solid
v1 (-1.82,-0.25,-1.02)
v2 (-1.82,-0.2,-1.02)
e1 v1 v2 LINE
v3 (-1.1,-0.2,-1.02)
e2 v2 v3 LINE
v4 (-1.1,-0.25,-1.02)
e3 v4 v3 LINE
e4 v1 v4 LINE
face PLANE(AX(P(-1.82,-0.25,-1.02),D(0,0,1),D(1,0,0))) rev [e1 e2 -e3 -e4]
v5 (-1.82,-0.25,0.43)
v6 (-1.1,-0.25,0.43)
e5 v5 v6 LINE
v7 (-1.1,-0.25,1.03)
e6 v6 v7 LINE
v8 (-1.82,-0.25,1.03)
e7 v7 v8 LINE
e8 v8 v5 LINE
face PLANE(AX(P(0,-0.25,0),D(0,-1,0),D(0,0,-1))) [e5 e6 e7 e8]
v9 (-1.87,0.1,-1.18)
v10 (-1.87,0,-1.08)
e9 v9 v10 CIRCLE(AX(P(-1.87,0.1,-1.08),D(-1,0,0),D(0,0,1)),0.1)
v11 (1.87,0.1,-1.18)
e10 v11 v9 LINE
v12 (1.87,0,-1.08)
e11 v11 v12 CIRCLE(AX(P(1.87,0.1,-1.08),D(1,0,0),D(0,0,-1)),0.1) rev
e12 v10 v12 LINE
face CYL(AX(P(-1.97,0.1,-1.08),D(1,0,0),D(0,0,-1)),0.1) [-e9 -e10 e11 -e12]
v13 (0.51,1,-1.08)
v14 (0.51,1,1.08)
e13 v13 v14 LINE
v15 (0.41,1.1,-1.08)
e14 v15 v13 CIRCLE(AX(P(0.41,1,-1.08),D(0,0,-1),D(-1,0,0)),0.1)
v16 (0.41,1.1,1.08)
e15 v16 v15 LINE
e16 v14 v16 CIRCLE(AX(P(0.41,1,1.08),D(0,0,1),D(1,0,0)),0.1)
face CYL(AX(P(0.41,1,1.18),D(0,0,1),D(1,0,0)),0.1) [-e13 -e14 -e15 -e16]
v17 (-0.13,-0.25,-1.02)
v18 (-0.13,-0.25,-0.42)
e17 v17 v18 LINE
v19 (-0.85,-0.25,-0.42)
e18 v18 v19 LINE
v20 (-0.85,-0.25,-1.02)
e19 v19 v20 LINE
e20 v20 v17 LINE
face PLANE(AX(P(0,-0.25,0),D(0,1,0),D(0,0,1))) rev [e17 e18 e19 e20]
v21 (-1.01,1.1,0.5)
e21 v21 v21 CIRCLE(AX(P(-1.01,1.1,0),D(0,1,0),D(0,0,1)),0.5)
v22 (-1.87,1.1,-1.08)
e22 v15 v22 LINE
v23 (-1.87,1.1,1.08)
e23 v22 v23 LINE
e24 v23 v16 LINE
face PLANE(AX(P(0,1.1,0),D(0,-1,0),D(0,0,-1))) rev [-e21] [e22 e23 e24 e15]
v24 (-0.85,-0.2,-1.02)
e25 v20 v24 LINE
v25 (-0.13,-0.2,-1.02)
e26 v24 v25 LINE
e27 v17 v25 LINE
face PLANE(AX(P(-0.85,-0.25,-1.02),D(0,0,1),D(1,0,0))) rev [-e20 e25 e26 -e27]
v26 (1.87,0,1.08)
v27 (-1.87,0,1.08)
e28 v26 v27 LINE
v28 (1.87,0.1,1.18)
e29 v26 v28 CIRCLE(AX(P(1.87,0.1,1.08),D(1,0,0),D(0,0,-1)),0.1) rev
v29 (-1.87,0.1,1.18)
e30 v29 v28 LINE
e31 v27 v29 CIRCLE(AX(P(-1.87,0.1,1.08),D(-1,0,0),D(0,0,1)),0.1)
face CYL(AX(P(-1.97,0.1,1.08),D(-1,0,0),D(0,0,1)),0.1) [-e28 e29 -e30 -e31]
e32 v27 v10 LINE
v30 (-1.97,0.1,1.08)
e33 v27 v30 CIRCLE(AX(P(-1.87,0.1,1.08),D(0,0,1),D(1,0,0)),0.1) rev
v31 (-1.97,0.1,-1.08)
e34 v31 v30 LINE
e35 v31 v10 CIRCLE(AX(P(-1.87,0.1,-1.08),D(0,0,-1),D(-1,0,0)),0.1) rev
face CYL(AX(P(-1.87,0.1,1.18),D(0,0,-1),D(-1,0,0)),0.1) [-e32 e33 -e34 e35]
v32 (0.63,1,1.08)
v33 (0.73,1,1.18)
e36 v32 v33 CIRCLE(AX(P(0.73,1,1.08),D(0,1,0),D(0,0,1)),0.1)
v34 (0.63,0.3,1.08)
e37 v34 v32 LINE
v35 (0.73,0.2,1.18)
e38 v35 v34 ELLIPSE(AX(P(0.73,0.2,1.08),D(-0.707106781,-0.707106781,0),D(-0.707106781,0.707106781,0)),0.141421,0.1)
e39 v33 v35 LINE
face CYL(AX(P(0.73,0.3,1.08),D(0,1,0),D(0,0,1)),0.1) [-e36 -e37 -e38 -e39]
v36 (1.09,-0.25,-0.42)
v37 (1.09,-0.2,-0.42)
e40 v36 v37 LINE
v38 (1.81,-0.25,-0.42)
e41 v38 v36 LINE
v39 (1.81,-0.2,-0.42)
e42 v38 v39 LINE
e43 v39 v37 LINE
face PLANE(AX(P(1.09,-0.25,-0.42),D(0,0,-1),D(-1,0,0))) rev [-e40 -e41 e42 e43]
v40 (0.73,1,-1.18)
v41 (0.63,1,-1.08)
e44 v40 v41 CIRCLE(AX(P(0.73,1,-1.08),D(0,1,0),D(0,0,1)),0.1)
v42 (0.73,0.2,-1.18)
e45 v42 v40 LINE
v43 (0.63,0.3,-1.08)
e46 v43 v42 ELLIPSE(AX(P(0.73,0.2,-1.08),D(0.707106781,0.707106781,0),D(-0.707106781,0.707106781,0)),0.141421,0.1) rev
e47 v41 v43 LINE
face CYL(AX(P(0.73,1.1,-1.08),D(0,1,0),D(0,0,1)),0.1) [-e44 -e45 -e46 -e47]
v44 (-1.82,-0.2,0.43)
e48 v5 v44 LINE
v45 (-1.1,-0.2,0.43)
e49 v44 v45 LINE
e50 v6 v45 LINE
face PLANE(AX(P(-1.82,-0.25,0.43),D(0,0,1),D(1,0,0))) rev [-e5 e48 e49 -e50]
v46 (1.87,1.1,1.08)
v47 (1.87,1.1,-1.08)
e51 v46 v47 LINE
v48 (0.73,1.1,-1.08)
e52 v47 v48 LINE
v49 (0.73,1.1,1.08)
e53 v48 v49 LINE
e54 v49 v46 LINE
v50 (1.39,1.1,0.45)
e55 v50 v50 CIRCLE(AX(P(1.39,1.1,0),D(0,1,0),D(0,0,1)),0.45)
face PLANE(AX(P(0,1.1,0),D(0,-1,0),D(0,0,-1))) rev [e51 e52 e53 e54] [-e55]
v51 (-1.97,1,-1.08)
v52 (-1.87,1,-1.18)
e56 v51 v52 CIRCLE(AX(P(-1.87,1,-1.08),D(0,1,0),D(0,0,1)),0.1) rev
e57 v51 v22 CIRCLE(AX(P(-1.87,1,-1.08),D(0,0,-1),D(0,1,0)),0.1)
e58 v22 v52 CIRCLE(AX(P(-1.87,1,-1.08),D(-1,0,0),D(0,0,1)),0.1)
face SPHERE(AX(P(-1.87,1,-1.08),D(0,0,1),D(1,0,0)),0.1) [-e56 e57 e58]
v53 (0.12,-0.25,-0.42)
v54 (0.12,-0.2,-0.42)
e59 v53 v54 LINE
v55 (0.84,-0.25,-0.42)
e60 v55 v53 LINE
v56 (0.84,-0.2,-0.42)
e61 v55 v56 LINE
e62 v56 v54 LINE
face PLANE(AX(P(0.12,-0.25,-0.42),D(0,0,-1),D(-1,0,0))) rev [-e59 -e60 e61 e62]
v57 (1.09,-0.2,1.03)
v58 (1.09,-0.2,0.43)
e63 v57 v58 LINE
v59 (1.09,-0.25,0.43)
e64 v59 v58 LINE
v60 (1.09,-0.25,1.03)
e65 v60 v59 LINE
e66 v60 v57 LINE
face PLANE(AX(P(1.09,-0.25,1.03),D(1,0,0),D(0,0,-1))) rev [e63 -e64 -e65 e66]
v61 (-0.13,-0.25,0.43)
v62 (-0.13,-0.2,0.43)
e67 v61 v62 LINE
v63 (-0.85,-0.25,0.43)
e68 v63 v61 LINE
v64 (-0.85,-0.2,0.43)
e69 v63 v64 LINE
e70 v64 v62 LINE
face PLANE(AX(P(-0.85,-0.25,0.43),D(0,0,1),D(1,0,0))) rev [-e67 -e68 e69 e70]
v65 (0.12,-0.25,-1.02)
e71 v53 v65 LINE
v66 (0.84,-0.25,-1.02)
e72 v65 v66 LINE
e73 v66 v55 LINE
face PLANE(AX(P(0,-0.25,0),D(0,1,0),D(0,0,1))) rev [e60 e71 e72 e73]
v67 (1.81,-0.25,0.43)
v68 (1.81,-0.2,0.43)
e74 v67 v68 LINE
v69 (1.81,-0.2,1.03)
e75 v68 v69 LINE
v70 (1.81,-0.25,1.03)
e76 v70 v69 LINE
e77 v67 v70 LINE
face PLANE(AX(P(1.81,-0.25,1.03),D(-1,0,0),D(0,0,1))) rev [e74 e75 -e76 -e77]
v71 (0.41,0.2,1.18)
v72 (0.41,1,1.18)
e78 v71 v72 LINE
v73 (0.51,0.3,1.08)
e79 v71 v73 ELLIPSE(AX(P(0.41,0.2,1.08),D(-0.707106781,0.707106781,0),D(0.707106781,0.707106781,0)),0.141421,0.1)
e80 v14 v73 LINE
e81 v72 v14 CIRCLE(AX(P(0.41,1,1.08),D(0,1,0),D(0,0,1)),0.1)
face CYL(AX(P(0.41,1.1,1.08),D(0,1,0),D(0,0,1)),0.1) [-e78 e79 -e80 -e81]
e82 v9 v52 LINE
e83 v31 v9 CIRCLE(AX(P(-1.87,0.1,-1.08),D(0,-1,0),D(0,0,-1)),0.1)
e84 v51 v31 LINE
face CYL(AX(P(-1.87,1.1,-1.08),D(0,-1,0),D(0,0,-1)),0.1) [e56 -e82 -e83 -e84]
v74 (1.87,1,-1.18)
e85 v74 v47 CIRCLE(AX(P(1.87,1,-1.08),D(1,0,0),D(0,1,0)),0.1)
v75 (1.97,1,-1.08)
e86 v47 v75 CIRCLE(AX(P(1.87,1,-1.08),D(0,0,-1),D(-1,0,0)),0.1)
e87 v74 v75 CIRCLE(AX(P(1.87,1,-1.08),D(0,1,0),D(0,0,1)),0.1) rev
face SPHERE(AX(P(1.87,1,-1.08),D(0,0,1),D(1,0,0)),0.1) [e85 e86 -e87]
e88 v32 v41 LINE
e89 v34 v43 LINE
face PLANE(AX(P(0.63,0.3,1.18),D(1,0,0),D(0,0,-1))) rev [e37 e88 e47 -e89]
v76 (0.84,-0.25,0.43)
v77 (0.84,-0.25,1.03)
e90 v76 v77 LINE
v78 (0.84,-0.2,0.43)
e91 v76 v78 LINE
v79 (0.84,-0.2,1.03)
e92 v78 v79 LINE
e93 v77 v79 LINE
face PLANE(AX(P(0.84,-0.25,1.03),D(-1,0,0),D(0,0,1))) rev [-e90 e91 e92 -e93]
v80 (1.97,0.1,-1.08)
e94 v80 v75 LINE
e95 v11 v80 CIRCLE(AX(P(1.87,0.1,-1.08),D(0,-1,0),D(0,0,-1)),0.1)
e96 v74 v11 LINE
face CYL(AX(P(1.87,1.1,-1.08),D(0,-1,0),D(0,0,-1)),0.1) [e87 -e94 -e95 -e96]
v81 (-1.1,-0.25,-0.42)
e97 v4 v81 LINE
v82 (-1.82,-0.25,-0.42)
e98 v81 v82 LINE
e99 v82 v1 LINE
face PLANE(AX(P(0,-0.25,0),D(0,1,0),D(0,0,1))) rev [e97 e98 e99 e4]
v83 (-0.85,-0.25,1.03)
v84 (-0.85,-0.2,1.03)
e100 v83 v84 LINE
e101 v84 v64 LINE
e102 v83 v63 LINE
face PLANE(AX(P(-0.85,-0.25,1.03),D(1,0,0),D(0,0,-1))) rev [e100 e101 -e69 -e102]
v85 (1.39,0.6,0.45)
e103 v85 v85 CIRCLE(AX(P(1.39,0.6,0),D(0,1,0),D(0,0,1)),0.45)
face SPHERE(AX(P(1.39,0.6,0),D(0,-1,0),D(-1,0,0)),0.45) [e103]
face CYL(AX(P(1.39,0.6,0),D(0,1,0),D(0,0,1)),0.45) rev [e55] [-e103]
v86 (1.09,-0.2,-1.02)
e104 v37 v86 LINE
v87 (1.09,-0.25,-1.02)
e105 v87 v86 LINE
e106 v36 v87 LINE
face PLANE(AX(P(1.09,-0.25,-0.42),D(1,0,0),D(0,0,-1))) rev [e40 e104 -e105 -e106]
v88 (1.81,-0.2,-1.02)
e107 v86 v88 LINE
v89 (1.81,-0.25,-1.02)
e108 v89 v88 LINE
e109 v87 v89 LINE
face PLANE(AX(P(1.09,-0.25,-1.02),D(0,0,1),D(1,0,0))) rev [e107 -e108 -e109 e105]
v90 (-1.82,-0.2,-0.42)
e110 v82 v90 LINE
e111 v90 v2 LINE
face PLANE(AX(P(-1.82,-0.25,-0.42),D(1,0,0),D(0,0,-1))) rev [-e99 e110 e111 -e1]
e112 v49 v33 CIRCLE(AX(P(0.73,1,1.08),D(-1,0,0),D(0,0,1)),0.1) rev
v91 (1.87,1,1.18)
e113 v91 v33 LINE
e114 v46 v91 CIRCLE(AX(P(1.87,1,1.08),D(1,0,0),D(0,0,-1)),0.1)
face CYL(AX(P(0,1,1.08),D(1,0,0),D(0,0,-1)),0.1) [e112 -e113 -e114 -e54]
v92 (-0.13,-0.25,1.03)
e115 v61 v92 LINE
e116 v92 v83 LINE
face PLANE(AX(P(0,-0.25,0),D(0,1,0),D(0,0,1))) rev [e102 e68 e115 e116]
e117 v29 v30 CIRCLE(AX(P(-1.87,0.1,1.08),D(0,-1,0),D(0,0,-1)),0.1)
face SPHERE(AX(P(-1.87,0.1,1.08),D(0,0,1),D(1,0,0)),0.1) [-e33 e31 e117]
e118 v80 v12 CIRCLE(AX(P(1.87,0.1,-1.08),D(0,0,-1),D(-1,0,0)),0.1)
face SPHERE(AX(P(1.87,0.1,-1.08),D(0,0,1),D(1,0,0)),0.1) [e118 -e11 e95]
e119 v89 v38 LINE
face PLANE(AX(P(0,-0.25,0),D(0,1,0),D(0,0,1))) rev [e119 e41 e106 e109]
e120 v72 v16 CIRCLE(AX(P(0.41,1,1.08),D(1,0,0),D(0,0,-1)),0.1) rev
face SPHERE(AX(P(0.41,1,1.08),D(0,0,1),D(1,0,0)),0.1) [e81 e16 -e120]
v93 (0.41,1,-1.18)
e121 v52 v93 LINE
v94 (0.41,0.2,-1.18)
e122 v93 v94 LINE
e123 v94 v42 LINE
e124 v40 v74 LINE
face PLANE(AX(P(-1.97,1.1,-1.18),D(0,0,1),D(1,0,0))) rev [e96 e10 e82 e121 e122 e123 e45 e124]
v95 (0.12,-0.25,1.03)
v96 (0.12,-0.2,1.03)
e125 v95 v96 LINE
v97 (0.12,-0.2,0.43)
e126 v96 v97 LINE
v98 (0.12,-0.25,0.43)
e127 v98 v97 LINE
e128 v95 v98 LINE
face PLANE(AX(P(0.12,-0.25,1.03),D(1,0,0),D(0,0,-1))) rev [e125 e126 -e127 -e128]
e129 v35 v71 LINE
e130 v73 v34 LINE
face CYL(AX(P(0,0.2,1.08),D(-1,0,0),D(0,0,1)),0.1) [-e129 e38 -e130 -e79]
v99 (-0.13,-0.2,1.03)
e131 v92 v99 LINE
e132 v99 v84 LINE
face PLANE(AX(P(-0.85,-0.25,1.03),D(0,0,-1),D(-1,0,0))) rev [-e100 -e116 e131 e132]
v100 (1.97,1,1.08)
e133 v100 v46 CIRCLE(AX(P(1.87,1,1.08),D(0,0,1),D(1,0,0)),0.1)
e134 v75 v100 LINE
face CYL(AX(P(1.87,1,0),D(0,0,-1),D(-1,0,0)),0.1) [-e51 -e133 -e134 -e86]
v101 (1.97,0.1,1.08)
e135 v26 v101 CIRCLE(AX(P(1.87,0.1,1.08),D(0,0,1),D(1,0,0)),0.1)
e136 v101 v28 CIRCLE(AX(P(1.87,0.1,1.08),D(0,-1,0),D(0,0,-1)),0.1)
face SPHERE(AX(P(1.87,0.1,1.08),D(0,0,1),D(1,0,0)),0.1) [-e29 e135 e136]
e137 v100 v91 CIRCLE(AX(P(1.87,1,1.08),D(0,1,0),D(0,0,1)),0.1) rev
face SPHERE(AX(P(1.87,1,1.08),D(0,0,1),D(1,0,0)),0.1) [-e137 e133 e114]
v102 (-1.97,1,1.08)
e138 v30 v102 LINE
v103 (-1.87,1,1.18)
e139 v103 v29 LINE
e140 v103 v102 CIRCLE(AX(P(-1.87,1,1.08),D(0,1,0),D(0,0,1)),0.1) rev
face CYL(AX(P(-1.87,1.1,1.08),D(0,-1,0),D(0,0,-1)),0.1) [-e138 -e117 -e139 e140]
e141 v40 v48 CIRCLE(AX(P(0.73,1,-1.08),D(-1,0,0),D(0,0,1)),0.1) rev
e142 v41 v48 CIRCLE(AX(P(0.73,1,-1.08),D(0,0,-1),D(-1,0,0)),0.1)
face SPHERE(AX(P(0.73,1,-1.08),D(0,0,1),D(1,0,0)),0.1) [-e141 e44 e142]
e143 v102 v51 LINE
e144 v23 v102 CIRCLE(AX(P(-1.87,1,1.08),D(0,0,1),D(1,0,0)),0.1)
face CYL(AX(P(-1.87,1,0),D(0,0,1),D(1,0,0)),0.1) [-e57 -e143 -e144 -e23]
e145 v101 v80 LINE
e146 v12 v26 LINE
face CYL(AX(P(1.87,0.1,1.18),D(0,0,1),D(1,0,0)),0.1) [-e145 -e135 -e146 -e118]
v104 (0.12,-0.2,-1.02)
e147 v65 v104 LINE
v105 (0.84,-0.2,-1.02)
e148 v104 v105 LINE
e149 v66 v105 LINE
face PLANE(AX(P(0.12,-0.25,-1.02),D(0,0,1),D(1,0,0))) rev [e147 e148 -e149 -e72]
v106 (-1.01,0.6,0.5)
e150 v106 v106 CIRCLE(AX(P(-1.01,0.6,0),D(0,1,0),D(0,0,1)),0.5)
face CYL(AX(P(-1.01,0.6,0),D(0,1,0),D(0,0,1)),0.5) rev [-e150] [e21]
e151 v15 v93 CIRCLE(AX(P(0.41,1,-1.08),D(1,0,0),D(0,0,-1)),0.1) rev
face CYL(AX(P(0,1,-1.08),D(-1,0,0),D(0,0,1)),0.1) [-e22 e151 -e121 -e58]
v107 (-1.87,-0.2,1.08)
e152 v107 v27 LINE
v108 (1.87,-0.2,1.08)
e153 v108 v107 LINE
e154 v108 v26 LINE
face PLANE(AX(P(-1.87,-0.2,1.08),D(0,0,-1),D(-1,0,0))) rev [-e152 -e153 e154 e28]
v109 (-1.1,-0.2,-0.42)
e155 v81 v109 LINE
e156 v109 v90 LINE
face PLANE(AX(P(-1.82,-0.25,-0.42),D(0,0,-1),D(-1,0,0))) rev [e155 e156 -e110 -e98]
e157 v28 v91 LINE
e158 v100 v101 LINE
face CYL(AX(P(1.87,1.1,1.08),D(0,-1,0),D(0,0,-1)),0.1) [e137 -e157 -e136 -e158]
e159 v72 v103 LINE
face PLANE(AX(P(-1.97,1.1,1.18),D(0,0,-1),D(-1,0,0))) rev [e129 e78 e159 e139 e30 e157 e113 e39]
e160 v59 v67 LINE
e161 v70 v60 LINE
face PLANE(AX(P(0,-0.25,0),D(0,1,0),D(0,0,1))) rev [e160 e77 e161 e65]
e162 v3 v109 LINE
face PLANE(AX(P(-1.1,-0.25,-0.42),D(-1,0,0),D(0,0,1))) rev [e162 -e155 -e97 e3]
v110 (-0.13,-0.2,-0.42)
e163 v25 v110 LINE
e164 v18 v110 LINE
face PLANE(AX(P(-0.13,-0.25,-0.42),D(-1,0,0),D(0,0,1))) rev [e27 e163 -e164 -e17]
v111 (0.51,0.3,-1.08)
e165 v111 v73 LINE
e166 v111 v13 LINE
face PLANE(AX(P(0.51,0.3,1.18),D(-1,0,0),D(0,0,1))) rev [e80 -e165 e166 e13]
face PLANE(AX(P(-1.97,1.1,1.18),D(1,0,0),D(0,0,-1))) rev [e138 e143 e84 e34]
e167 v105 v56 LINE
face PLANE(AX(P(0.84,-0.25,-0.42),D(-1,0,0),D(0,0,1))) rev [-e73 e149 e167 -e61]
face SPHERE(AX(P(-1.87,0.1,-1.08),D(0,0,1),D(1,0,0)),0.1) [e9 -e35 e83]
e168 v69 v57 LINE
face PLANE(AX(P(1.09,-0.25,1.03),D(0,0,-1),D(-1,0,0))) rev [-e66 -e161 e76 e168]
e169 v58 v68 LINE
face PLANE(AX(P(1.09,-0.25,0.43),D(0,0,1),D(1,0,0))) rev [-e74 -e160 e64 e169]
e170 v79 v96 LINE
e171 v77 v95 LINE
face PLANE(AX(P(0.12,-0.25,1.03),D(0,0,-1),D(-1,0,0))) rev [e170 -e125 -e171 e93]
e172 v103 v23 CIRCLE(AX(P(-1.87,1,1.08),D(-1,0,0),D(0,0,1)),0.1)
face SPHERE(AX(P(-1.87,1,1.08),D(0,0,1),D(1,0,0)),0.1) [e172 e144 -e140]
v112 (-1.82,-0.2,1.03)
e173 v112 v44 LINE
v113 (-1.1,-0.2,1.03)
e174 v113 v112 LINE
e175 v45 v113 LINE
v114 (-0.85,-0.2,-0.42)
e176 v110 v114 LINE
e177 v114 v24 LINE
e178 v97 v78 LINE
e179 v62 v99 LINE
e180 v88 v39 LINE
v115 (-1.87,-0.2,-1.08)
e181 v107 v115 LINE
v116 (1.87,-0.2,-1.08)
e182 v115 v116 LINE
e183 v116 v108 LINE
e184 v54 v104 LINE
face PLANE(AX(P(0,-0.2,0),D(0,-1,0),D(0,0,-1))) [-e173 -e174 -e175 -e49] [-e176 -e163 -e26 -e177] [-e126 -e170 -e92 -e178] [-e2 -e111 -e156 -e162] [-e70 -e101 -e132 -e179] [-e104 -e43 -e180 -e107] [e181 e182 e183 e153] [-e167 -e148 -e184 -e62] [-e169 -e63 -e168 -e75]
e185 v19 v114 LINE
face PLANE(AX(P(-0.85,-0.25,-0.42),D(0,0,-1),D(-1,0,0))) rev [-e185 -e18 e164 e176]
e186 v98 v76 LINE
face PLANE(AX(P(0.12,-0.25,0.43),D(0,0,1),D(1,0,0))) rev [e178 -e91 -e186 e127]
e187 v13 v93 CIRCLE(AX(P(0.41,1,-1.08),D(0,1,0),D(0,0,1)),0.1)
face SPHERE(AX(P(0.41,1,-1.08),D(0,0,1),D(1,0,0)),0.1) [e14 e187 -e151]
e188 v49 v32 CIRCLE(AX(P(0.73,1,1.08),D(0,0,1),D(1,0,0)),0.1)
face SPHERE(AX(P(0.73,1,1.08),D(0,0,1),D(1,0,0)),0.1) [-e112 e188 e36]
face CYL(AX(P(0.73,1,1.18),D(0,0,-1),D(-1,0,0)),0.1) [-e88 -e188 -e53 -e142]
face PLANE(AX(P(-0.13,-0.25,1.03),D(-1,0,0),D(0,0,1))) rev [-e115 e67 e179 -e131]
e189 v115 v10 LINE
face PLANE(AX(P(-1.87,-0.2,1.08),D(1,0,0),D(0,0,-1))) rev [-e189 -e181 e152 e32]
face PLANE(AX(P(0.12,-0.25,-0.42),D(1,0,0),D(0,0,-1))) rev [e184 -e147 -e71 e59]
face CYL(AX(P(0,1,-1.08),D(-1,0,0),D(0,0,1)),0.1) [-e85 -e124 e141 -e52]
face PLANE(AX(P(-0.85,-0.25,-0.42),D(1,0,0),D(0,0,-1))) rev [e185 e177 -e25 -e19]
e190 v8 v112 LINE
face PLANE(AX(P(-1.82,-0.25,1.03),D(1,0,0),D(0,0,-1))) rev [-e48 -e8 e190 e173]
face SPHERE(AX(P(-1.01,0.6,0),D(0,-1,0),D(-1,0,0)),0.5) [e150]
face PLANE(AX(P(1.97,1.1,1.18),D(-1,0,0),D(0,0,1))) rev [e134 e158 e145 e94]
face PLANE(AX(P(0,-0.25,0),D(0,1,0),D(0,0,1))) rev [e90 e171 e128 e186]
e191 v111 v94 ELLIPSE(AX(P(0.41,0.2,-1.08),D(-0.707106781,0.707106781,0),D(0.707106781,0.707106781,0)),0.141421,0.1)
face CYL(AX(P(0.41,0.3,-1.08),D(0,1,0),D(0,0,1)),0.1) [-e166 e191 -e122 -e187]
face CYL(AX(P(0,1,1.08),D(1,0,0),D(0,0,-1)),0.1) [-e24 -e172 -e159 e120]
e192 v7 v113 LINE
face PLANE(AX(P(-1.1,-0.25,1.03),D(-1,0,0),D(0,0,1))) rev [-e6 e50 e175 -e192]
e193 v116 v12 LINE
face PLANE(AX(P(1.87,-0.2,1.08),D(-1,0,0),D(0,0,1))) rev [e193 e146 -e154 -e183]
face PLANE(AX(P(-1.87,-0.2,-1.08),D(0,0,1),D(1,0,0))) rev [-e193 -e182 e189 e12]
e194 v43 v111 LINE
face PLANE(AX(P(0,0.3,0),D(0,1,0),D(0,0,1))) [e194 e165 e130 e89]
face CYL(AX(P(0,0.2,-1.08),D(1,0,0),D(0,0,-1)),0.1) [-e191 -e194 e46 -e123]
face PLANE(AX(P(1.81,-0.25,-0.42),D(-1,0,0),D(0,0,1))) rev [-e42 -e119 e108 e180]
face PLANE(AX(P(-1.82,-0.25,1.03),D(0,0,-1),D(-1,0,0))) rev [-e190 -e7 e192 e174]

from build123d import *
from build123d.topology import SkipClean

# Parameters (mm, degrees)
SKETCH_1_W          = 3.94
SKETCH_1_H          = 2.36
BOSS_EXTRUDE1_DEPTH = 1.1
SKETCH_2_W          = 3.74
SKETCH_2_H          = 2.16
BOSS_EXTRUDE2_DEPTH = 0.2
SKETCH_3_W          = 0.72
SKETCH_3_H          = 0.6
BOSS_EXTRUDE3_DEPTH = 0.05
SKETCH_4_W          = 0.12
SKETCH_4_H          = 2.36
CUT_EXTRUDE1_DEPTH  = 0.8
FILLET1_R           = 0.1
SKETCH_5_R          = 0.5
SKETCH_5_R_2        = 0.45
CUT_EXTRUDE2_DEPTH  = 0.5


with BuildPart() as part:
    # 草图1 → Boss-Extrude1 (new body)
    with BuildSketch(Plane(origin=(0, 0, 0), x_dir=(1, 0, 0), z_dir=(0, 1, 0))):
        Rectangle(SKETCH_1_W, SKETCH_1_H)
    extrude(amount=BOSS_EXTRUDE1_DEPTH)

    # 草图2 → Boss-Extrude2 (add)
    with BuildSketch(Plane.XZ):
        Rectangle(SKETCH_2_W, SKETCH_2_H)
    extrude(amount=BOSS_EXTRUDE2_DEPTH)

    # 草图3 → Boss-Extrude3 (add)
    with BuildSketch(Plane.XZ.offset(0.2)):
        with Locations((-1.46, 0.73)):
            Rectangle(SKETCH_3_W, SKETCH_3_H)
        with Locations((-0.49, 0.73)):
            Rectangle(SKETCH_3_W, SKETCH_3_H)
        with Locations((0.48, 0.73)):
            Rectangle(SKETCH_3_W, SKETCH_3_H)
        with Locations((1.45, 0.73)):
            Rectangle(SKETCH_3_W, SKETCH_3_H)
        with Locations((-0.49, -0.72)):
            Rectangle(SKETCH_3_W, SKETCH_3_H)
        with Locations((0.48, -0.72)):
            Rectangle(SKETCH_3_W, SKETCH_3_H)
        with Locations((1.45, -0.72)):
            Rectangle(SKETCH_3_W, SKETCH_3_H)
        with Locations((-1.46, -0.72)):
            Rectangle(SKETCH_3_W, SKETCH_3_H)
    extrude(amount=BOSS_EXTRUDE3_DEPTH)

    # 草图4 → Cut-Extrude1 (cut)
    with BuildSketch(Plane(origin=(0, 1.1, 0), x_dir=(1, 0, 0), z_dir=(0, 1, 0))):
        with Locations((0.57, 0)):
            Rectangle(SKETCH_4_W, SKETCH_4_H)
    extrude(amount=-CUT_EXTRUDE1_DEPTH, mode=Mode.SUBTRACT)

    # Fillet1
    fillet1_edges = [part.edges().sort_by_distance(p)[0] for p in [
        (-1.97, 1.1, 0),
        (-0.73, 1.1, -1.18),
        (1.3, 1.1, 1.18),
        (0.63, 0.7, -1.18),
        (0.57, 0.3, 1.18),
        (0.63, 0.7, 1.18),
        (0.51, 0.7, 1.18),
        (0.57, 0.3, -1.18),
        (0.51, 0.7, -1.18),
        (0.63, 1.1, 0),
        (0.51, 1.1, 0),
        (-0.73, 1.1, 1.18),
        (1.97, 1.1, 0),
        (0, 0, 1.18),
        (-1.97, 0, 0),
        (0, 0, -1.18),
        (1.97, 0, 0),
        (1.3, 1.1, -1.18),
        (1.97, 0.55, 1.18),
        (-1.97, 0.55, 1.18),
        (-1.97, 0.55, -1.18),
        (1.97, 0.55, -1.18),
    ]]
    fillet(fillet1_edges, radius=FILLET1_R - 0.0001)  # a hair under: the kernel refuses the full size

    # 草图5 → Cut-Extrude2 (cut)
    with BuildSketch(Plane(origin=(0, 1.1, 0), x_dir=(1, 0, 0), z_dir=(0, 1, 0))):
        with Locations(Location((-1.01, 0, 0), (0, 0, 270))):
            Circle(SKETCH_5_R)
        with Locations(Location((1.39, 0, 0), (0, 0, 270))):
            Circle(SKETCH_5_R_2)
    extrude(amount=-CUT_EXTRUDE2_DEPTH, mode=Mode.SUBTRACT)

    # 草图6 → Boss-Revole1 (revolve)
    with SkipClean():  # the faces are left unmerged after this step: merging them gives an invalid solid
        with BuildSketch(Plane.XY):
            with BuildLine():
                ThreePointArc((-1.01, 1.1), (-1.363553391, 0.953553391), (-1.51, 0.6))
                Line((-1.51, 0.6), (-1.01, 0.6))
                Line((-1.01, 0.6), (-1.01, 1.1))
            make_face()
            with BuildLine():
                Line((-1.01, 1.1), (-1.01, 0.6))
                Line((-1.01, 0.6), (-0.51, 0.6))
                ThreePointArc((-0.51, 0.6), (-0.656446609, 0.953553391), (-1.01, 1.1))
            make_face()
        revolve(axis=Axis((-1.01, 0.436033652, 0), (0, 1, 0)))
    add(part.part.scale(1), mode=Mode.REPLACE)  # the faces are merged on a copy

    # 草图7 → Boss-Revole2 (revolve)
    with BuildSketch(Plane.XY):
        with BuildLine():
            Line((0.94, 0.6), (1.39, 0.6))
            Line((1.39, 0.6), (1.39, 1.05))
            ThreePointArc((1.39, 1.05), (1.071801948, 0.918198052), (0.94, 0.6))
        make_face()
    revolve(axis=Axis((1.39, 0.6, 0), (0, 1, 0)))


solid = part.part
